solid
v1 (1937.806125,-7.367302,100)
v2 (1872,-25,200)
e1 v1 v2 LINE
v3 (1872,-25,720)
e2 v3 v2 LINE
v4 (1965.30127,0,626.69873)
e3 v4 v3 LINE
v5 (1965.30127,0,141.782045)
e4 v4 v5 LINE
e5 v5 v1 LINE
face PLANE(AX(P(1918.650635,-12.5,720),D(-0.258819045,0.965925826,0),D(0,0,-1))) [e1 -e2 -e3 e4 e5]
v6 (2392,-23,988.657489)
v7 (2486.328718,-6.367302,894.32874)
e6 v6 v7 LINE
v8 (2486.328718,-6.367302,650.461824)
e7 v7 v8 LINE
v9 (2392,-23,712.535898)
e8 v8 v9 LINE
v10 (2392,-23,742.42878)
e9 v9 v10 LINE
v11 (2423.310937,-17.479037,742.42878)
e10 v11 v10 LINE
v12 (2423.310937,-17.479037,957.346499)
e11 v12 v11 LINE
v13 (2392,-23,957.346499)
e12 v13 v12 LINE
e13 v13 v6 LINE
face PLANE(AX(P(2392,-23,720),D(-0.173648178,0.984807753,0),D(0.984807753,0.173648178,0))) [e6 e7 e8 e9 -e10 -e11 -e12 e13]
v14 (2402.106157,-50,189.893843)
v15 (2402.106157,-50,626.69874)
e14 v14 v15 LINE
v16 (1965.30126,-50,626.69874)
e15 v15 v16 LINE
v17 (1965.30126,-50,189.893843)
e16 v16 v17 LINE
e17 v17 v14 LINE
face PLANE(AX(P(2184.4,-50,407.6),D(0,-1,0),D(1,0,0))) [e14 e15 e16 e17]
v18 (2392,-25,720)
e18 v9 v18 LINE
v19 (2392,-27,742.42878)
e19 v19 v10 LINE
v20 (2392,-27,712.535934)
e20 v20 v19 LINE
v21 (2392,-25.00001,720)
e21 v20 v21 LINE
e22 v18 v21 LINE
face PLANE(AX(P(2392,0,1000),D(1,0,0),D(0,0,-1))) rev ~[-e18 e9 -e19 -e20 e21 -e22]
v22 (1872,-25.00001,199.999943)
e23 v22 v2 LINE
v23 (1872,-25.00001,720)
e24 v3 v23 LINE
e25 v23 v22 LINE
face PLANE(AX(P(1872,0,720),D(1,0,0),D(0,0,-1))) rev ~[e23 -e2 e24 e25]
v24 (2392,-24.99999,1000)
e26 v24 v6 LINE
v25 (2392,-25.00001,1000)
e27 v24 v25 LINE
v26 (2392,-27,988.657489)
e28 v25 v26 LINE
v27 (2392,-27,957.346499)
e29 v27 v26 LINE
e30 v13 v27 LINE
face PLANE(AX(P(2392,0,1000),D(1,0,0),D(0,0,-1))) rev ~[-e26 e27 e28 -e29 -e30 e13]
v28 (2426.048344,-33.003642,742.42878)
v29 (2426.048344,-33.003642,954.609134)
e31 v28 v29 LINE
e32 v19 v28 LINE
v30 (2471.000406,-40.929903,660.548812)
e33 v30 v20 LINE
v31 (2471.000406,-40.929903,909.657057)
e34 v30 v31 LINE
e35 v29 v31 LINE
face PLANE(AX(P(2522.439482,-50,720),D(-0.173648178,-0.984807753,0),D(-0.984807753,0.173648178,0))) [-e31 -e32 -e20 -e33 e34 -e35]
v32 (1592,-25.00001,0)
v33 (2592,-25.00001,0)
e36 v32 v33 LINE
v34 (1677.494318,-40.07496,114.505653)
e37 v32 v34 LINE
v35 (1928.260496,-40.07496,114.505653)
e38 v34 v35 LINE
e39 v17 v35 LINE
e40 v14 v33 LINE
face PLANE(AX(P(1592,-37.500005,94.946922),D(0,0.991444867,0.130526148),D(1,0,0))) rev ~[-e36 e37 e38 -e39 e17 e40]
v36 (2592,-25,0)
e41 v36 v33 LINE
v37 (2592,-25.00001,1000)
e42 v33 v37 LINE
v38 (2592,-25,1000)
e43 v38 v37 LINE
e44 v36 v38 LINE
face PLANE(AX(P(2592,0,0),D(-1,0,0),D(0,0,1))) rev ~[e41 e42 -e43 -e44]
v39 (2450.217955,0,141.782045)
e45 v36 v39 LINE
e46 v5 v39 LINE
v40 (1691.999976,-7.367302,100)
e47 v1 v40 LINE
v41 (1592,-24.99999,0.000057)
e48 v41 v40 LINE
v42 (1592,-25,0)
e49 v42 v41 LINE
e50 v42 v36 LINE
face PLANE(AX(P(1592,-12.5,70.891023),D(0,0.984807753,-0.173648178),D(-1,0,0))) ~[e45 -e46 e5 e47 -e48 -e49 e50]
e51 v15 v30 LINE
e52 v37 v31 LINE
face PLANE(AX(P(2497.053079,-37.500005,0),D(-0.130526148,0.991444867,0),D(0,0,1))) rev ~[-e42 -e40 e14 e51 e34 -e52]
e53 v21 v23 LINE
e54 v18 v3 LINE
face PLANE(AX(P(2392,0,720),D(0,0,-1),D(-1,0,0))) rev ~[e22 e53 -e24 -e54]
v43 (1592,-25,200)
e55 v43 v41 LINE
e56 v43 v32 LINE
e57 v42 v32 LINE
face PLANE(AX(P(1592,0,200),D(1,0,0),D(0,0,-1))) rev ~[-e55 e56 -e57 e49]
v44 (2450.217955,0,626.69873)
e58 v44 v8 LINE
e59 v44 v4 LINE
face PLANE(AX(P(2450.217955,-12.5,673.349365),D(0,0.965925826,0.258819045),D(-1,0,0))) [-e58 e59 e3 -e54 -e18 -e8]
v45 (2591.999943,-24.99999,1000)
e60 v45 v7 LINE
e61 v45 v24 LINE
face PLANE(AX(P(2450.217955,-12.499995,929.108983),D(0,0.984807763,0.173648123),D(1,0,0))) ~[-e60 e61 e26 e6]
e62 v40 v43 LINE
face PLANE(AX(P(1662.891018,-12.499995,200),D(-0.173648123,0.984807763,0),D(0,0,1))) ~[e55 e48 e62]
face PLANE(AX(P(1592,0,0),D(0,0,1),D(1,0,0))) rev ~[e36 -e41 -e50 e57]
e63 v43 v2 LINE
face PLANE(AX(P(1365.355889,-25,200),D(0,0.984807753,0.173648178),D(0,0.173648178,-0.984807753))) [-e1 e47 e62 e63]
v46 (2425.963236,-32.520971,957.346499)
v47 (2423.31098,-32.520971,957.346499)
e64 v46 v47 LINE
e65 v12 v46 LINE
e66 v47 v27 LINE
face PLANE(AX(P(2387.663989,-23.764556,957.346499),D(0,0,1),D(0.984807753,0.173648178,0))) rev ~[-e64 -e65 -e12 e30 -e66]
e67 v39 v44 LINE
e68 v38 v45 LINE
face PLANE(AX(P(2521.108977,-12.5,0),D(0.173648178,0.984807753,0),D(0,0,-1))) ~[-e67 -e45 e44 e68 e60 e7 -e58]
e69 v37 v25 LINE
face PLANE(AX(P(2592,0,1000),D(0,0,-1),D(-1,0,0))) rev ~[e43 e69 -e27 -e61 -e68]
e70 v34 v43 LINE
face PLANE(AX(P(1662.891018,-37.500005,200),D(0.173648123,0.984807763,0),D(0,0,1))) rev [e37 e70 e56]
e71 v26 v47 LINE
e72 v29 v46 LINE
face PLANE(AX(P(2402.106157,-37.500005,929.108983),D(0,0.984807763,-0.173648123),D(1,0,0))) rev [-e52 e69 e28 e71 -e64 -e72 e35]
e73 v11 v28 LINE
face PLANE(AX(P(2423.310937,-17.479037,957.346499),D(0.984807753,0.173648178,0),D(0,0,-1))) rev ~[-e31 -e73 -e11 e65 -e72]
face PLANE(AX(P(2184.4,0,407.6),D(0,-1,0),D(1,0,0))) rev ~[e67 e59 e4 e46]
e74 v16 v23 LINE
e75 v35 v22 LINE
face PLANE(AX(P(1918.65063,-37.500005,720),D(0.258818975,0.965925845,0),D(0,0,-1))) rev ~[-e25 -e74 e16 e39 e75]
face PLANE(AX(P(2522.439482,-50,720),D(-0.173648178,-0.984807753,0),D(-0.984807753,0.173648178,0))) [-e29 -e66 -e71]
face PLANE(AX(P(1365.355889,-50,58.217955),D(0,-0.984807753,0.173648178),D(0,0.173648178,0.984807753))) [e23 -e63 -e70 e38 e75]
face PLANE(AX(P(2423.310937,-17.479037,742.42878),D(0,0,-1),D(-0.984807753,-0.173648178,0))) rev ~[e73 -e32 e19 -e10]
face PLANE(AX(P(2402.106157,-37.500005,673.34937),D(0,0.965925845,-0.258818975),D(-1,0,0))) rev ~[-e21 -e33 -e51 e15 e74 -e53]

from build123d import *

# Parameters (mm, degrees)
F1_DEPTH    = 50
F3_SIZE2    = 141.7820454904
F3_SIZE     = 25
F4_SIZE2    = 24.99999
F4_SIZE     = 189.893843
F5_SIZE2    = 141.782035
F5_SIZE     = 24.99999
F5_2_SIZE2  = 141.782035
F5_2_SIZE   = 24.99999
F6_T1_DEPTH = 477.1700191754
F7_T1_DEPTH = 506.6441108429
F8_SIZE2    = 25
F8_SIZE     = 93.3012701892
F8_2_SIZE2  = 24.99999
F8_2_SIZE   = 93.30126
F10_DEPTH   = 25


# Not quite as in the source:
# - a fillet or chamfer that OpenCascade refuses, or shapes differently, is made with other operations: its cross-section is extruded or revolved along the edge and cut away or added
# - a fillet or chamfer is up to 0.001 mm smaller than in the source, because OpenCascade refuses the exact size


with BuildPart() as f1:
    # F0 (on Front) → F1 (new body)
    with BuildSketch(Plane.XZ):
        Polygon((0, 200), (0, 0), (1000, 0), (1000, 1000), (800, 1000), (800, 720), (280, 720), (280, 200), align=None)
    extrude(amount=F1_DEPTH)


with BuildPart() as f1_1:
    # F2: moved
    add(f1.part.moved(Location((1592, 0, 0))))

    # F3
    f3_edges = [f1_1.edges().sort_by_distance(p)[0] for p in [
        (2592, 0, 500),
        (2092, 0, 0),
    ]]
    chamfer(f3_edges, length=F3_SIZE, length2=F3_SIZE2)

    # F4 (size 189.8938528181 and 25 in the source; OpenCascade refuses exactly that, so slightly less here)
    f4_edges = [f1_1.edges().sort_by_distance(p)[0] for p in [
        (2092, -50, 0),
        (2592, -50, 500),
    ]]
    f4_side = f1_1.faces().sort_by_distance((2210.680203, -50, 381.319797))[0]
    chamfer(f4_edges, length=F4_SIZE, length2=F4_SIZE2, reference=f4_side)

    # F5 (size 25 and 141.7820454904 in the source; OpenCascade refuses exactly that, so slightly less here)
    f5_edges = [f1_1.edges().sort_by_distance(p)[0] for p in [
        (2421.108977, 0, 1000),
        (2397.053079, -50, 1000),
    ]]
    f5_side = f1_1.faces().sort_by_distance((2461.151755, -23.287804, 1000))[0]
    chamfer(f5_edges, length=F5_SIZE, length2=F5_SIZE2, reference=f5_side)

    # F5#2 (size 25 and 141.7820454904 in the source; OpenCascade refuses exactly that, so slightly less here)
    f5_2_edges = [f1_1.edges().sort_by_distance(p)[0] for p in [
        (1592, 0, 170.891023),
        (1592, -50, 194.946922),
    ]]
    f5_2_side = f1_1.faces().sort_by_distance((1592, -23.287804, 130.848245))[0]
    chamfer(f5_2_edges, length=F5_2_SIZE, length2=F5_2_SIZE2, reference=f5_2_side)

    # F6: chamfer of 23 x 130.4394818512 on 2 edges, made by hand

    # F6_s2 → F6_t1 (cut)
    with BuildSketch(Plane.XY.offset(720)):
        Polygon((2522.4394818512, -50), (2392, -27), (2392, -50), align=None)
        Polygon((2392, -23), (2522.4394818512, 0), (2392, 0), align=None)
    extrude(amount=F6_T1_DEPTH, mode=Mode.SUBTRACT)

    # F7: chamfer of 25 x 141.7820454904 on 2 edges, made by hand

    # F7_s2 → F7_t1 (cut)
    with BuildSketch(Plane.YZ.offset(1365.3558891571)):
        Polygon((-25, 200), (0, 58.2179545096), (0, 200), align=None)
        Polygon((-50, 58.2179545096), (-25, 200), (-50, 200), align=None)
    extrude(amount=F7_T1_DEPTH, mode=Mode.SUBTRACT)

    # F8
    f8_edges = [f1_1.edges().sort_by_distance(p)[0] for p in [
        (1872, 0, 430.891023),
        (2161.108977, 0, 720),
    ]]
    f8_side = f1_1.faces().sort_by_distance((2161.108977, 0, 430.891023))[0]
    chamfer(f8_edges, length=F8_SIZE, length2=F8_SIZE2, reference=f8_side)

    # F8#2 (size 93.3012701892 and 25 in the source; OpenCascade refuses exactly that, so slightly less here)
    f8_2_edges = [f1_1.edges().sort_by_distance(p)[0] for p in [
        (1872, -50, 454.946922),
        (2137.053079, -50, 720),
    ]]
    f8_2_side = f1_1.faces().sort_by_distance((2137.053079, -50, 454.946921))[0]
    chamfer(f8_2_edges, length=F8_2_SIZE, length2=F8_2_SIZE2, reference=f8_2_side)

    # F9 (on face) → F10 (cut)
    with BuildSketch(Plane(origin=(76.0608571883, -431.3625565565, 0), x_dir=(-0.984807753, -0.1736481777, 0), z_dir=(-0.1736481777, 0.984807753, 0))):
        Polygon((-2346.6920852661, 742.4287796021), (-2347.2633361816, 957.3464989662), (-2383.4601961924, 957.3464989662), (-2383.4601961924, 742.4287796021), align=None)
    extrude(amount=-F10_DEPTH, mode=Mode.SUBTRACT)


solid = f1_1.part
